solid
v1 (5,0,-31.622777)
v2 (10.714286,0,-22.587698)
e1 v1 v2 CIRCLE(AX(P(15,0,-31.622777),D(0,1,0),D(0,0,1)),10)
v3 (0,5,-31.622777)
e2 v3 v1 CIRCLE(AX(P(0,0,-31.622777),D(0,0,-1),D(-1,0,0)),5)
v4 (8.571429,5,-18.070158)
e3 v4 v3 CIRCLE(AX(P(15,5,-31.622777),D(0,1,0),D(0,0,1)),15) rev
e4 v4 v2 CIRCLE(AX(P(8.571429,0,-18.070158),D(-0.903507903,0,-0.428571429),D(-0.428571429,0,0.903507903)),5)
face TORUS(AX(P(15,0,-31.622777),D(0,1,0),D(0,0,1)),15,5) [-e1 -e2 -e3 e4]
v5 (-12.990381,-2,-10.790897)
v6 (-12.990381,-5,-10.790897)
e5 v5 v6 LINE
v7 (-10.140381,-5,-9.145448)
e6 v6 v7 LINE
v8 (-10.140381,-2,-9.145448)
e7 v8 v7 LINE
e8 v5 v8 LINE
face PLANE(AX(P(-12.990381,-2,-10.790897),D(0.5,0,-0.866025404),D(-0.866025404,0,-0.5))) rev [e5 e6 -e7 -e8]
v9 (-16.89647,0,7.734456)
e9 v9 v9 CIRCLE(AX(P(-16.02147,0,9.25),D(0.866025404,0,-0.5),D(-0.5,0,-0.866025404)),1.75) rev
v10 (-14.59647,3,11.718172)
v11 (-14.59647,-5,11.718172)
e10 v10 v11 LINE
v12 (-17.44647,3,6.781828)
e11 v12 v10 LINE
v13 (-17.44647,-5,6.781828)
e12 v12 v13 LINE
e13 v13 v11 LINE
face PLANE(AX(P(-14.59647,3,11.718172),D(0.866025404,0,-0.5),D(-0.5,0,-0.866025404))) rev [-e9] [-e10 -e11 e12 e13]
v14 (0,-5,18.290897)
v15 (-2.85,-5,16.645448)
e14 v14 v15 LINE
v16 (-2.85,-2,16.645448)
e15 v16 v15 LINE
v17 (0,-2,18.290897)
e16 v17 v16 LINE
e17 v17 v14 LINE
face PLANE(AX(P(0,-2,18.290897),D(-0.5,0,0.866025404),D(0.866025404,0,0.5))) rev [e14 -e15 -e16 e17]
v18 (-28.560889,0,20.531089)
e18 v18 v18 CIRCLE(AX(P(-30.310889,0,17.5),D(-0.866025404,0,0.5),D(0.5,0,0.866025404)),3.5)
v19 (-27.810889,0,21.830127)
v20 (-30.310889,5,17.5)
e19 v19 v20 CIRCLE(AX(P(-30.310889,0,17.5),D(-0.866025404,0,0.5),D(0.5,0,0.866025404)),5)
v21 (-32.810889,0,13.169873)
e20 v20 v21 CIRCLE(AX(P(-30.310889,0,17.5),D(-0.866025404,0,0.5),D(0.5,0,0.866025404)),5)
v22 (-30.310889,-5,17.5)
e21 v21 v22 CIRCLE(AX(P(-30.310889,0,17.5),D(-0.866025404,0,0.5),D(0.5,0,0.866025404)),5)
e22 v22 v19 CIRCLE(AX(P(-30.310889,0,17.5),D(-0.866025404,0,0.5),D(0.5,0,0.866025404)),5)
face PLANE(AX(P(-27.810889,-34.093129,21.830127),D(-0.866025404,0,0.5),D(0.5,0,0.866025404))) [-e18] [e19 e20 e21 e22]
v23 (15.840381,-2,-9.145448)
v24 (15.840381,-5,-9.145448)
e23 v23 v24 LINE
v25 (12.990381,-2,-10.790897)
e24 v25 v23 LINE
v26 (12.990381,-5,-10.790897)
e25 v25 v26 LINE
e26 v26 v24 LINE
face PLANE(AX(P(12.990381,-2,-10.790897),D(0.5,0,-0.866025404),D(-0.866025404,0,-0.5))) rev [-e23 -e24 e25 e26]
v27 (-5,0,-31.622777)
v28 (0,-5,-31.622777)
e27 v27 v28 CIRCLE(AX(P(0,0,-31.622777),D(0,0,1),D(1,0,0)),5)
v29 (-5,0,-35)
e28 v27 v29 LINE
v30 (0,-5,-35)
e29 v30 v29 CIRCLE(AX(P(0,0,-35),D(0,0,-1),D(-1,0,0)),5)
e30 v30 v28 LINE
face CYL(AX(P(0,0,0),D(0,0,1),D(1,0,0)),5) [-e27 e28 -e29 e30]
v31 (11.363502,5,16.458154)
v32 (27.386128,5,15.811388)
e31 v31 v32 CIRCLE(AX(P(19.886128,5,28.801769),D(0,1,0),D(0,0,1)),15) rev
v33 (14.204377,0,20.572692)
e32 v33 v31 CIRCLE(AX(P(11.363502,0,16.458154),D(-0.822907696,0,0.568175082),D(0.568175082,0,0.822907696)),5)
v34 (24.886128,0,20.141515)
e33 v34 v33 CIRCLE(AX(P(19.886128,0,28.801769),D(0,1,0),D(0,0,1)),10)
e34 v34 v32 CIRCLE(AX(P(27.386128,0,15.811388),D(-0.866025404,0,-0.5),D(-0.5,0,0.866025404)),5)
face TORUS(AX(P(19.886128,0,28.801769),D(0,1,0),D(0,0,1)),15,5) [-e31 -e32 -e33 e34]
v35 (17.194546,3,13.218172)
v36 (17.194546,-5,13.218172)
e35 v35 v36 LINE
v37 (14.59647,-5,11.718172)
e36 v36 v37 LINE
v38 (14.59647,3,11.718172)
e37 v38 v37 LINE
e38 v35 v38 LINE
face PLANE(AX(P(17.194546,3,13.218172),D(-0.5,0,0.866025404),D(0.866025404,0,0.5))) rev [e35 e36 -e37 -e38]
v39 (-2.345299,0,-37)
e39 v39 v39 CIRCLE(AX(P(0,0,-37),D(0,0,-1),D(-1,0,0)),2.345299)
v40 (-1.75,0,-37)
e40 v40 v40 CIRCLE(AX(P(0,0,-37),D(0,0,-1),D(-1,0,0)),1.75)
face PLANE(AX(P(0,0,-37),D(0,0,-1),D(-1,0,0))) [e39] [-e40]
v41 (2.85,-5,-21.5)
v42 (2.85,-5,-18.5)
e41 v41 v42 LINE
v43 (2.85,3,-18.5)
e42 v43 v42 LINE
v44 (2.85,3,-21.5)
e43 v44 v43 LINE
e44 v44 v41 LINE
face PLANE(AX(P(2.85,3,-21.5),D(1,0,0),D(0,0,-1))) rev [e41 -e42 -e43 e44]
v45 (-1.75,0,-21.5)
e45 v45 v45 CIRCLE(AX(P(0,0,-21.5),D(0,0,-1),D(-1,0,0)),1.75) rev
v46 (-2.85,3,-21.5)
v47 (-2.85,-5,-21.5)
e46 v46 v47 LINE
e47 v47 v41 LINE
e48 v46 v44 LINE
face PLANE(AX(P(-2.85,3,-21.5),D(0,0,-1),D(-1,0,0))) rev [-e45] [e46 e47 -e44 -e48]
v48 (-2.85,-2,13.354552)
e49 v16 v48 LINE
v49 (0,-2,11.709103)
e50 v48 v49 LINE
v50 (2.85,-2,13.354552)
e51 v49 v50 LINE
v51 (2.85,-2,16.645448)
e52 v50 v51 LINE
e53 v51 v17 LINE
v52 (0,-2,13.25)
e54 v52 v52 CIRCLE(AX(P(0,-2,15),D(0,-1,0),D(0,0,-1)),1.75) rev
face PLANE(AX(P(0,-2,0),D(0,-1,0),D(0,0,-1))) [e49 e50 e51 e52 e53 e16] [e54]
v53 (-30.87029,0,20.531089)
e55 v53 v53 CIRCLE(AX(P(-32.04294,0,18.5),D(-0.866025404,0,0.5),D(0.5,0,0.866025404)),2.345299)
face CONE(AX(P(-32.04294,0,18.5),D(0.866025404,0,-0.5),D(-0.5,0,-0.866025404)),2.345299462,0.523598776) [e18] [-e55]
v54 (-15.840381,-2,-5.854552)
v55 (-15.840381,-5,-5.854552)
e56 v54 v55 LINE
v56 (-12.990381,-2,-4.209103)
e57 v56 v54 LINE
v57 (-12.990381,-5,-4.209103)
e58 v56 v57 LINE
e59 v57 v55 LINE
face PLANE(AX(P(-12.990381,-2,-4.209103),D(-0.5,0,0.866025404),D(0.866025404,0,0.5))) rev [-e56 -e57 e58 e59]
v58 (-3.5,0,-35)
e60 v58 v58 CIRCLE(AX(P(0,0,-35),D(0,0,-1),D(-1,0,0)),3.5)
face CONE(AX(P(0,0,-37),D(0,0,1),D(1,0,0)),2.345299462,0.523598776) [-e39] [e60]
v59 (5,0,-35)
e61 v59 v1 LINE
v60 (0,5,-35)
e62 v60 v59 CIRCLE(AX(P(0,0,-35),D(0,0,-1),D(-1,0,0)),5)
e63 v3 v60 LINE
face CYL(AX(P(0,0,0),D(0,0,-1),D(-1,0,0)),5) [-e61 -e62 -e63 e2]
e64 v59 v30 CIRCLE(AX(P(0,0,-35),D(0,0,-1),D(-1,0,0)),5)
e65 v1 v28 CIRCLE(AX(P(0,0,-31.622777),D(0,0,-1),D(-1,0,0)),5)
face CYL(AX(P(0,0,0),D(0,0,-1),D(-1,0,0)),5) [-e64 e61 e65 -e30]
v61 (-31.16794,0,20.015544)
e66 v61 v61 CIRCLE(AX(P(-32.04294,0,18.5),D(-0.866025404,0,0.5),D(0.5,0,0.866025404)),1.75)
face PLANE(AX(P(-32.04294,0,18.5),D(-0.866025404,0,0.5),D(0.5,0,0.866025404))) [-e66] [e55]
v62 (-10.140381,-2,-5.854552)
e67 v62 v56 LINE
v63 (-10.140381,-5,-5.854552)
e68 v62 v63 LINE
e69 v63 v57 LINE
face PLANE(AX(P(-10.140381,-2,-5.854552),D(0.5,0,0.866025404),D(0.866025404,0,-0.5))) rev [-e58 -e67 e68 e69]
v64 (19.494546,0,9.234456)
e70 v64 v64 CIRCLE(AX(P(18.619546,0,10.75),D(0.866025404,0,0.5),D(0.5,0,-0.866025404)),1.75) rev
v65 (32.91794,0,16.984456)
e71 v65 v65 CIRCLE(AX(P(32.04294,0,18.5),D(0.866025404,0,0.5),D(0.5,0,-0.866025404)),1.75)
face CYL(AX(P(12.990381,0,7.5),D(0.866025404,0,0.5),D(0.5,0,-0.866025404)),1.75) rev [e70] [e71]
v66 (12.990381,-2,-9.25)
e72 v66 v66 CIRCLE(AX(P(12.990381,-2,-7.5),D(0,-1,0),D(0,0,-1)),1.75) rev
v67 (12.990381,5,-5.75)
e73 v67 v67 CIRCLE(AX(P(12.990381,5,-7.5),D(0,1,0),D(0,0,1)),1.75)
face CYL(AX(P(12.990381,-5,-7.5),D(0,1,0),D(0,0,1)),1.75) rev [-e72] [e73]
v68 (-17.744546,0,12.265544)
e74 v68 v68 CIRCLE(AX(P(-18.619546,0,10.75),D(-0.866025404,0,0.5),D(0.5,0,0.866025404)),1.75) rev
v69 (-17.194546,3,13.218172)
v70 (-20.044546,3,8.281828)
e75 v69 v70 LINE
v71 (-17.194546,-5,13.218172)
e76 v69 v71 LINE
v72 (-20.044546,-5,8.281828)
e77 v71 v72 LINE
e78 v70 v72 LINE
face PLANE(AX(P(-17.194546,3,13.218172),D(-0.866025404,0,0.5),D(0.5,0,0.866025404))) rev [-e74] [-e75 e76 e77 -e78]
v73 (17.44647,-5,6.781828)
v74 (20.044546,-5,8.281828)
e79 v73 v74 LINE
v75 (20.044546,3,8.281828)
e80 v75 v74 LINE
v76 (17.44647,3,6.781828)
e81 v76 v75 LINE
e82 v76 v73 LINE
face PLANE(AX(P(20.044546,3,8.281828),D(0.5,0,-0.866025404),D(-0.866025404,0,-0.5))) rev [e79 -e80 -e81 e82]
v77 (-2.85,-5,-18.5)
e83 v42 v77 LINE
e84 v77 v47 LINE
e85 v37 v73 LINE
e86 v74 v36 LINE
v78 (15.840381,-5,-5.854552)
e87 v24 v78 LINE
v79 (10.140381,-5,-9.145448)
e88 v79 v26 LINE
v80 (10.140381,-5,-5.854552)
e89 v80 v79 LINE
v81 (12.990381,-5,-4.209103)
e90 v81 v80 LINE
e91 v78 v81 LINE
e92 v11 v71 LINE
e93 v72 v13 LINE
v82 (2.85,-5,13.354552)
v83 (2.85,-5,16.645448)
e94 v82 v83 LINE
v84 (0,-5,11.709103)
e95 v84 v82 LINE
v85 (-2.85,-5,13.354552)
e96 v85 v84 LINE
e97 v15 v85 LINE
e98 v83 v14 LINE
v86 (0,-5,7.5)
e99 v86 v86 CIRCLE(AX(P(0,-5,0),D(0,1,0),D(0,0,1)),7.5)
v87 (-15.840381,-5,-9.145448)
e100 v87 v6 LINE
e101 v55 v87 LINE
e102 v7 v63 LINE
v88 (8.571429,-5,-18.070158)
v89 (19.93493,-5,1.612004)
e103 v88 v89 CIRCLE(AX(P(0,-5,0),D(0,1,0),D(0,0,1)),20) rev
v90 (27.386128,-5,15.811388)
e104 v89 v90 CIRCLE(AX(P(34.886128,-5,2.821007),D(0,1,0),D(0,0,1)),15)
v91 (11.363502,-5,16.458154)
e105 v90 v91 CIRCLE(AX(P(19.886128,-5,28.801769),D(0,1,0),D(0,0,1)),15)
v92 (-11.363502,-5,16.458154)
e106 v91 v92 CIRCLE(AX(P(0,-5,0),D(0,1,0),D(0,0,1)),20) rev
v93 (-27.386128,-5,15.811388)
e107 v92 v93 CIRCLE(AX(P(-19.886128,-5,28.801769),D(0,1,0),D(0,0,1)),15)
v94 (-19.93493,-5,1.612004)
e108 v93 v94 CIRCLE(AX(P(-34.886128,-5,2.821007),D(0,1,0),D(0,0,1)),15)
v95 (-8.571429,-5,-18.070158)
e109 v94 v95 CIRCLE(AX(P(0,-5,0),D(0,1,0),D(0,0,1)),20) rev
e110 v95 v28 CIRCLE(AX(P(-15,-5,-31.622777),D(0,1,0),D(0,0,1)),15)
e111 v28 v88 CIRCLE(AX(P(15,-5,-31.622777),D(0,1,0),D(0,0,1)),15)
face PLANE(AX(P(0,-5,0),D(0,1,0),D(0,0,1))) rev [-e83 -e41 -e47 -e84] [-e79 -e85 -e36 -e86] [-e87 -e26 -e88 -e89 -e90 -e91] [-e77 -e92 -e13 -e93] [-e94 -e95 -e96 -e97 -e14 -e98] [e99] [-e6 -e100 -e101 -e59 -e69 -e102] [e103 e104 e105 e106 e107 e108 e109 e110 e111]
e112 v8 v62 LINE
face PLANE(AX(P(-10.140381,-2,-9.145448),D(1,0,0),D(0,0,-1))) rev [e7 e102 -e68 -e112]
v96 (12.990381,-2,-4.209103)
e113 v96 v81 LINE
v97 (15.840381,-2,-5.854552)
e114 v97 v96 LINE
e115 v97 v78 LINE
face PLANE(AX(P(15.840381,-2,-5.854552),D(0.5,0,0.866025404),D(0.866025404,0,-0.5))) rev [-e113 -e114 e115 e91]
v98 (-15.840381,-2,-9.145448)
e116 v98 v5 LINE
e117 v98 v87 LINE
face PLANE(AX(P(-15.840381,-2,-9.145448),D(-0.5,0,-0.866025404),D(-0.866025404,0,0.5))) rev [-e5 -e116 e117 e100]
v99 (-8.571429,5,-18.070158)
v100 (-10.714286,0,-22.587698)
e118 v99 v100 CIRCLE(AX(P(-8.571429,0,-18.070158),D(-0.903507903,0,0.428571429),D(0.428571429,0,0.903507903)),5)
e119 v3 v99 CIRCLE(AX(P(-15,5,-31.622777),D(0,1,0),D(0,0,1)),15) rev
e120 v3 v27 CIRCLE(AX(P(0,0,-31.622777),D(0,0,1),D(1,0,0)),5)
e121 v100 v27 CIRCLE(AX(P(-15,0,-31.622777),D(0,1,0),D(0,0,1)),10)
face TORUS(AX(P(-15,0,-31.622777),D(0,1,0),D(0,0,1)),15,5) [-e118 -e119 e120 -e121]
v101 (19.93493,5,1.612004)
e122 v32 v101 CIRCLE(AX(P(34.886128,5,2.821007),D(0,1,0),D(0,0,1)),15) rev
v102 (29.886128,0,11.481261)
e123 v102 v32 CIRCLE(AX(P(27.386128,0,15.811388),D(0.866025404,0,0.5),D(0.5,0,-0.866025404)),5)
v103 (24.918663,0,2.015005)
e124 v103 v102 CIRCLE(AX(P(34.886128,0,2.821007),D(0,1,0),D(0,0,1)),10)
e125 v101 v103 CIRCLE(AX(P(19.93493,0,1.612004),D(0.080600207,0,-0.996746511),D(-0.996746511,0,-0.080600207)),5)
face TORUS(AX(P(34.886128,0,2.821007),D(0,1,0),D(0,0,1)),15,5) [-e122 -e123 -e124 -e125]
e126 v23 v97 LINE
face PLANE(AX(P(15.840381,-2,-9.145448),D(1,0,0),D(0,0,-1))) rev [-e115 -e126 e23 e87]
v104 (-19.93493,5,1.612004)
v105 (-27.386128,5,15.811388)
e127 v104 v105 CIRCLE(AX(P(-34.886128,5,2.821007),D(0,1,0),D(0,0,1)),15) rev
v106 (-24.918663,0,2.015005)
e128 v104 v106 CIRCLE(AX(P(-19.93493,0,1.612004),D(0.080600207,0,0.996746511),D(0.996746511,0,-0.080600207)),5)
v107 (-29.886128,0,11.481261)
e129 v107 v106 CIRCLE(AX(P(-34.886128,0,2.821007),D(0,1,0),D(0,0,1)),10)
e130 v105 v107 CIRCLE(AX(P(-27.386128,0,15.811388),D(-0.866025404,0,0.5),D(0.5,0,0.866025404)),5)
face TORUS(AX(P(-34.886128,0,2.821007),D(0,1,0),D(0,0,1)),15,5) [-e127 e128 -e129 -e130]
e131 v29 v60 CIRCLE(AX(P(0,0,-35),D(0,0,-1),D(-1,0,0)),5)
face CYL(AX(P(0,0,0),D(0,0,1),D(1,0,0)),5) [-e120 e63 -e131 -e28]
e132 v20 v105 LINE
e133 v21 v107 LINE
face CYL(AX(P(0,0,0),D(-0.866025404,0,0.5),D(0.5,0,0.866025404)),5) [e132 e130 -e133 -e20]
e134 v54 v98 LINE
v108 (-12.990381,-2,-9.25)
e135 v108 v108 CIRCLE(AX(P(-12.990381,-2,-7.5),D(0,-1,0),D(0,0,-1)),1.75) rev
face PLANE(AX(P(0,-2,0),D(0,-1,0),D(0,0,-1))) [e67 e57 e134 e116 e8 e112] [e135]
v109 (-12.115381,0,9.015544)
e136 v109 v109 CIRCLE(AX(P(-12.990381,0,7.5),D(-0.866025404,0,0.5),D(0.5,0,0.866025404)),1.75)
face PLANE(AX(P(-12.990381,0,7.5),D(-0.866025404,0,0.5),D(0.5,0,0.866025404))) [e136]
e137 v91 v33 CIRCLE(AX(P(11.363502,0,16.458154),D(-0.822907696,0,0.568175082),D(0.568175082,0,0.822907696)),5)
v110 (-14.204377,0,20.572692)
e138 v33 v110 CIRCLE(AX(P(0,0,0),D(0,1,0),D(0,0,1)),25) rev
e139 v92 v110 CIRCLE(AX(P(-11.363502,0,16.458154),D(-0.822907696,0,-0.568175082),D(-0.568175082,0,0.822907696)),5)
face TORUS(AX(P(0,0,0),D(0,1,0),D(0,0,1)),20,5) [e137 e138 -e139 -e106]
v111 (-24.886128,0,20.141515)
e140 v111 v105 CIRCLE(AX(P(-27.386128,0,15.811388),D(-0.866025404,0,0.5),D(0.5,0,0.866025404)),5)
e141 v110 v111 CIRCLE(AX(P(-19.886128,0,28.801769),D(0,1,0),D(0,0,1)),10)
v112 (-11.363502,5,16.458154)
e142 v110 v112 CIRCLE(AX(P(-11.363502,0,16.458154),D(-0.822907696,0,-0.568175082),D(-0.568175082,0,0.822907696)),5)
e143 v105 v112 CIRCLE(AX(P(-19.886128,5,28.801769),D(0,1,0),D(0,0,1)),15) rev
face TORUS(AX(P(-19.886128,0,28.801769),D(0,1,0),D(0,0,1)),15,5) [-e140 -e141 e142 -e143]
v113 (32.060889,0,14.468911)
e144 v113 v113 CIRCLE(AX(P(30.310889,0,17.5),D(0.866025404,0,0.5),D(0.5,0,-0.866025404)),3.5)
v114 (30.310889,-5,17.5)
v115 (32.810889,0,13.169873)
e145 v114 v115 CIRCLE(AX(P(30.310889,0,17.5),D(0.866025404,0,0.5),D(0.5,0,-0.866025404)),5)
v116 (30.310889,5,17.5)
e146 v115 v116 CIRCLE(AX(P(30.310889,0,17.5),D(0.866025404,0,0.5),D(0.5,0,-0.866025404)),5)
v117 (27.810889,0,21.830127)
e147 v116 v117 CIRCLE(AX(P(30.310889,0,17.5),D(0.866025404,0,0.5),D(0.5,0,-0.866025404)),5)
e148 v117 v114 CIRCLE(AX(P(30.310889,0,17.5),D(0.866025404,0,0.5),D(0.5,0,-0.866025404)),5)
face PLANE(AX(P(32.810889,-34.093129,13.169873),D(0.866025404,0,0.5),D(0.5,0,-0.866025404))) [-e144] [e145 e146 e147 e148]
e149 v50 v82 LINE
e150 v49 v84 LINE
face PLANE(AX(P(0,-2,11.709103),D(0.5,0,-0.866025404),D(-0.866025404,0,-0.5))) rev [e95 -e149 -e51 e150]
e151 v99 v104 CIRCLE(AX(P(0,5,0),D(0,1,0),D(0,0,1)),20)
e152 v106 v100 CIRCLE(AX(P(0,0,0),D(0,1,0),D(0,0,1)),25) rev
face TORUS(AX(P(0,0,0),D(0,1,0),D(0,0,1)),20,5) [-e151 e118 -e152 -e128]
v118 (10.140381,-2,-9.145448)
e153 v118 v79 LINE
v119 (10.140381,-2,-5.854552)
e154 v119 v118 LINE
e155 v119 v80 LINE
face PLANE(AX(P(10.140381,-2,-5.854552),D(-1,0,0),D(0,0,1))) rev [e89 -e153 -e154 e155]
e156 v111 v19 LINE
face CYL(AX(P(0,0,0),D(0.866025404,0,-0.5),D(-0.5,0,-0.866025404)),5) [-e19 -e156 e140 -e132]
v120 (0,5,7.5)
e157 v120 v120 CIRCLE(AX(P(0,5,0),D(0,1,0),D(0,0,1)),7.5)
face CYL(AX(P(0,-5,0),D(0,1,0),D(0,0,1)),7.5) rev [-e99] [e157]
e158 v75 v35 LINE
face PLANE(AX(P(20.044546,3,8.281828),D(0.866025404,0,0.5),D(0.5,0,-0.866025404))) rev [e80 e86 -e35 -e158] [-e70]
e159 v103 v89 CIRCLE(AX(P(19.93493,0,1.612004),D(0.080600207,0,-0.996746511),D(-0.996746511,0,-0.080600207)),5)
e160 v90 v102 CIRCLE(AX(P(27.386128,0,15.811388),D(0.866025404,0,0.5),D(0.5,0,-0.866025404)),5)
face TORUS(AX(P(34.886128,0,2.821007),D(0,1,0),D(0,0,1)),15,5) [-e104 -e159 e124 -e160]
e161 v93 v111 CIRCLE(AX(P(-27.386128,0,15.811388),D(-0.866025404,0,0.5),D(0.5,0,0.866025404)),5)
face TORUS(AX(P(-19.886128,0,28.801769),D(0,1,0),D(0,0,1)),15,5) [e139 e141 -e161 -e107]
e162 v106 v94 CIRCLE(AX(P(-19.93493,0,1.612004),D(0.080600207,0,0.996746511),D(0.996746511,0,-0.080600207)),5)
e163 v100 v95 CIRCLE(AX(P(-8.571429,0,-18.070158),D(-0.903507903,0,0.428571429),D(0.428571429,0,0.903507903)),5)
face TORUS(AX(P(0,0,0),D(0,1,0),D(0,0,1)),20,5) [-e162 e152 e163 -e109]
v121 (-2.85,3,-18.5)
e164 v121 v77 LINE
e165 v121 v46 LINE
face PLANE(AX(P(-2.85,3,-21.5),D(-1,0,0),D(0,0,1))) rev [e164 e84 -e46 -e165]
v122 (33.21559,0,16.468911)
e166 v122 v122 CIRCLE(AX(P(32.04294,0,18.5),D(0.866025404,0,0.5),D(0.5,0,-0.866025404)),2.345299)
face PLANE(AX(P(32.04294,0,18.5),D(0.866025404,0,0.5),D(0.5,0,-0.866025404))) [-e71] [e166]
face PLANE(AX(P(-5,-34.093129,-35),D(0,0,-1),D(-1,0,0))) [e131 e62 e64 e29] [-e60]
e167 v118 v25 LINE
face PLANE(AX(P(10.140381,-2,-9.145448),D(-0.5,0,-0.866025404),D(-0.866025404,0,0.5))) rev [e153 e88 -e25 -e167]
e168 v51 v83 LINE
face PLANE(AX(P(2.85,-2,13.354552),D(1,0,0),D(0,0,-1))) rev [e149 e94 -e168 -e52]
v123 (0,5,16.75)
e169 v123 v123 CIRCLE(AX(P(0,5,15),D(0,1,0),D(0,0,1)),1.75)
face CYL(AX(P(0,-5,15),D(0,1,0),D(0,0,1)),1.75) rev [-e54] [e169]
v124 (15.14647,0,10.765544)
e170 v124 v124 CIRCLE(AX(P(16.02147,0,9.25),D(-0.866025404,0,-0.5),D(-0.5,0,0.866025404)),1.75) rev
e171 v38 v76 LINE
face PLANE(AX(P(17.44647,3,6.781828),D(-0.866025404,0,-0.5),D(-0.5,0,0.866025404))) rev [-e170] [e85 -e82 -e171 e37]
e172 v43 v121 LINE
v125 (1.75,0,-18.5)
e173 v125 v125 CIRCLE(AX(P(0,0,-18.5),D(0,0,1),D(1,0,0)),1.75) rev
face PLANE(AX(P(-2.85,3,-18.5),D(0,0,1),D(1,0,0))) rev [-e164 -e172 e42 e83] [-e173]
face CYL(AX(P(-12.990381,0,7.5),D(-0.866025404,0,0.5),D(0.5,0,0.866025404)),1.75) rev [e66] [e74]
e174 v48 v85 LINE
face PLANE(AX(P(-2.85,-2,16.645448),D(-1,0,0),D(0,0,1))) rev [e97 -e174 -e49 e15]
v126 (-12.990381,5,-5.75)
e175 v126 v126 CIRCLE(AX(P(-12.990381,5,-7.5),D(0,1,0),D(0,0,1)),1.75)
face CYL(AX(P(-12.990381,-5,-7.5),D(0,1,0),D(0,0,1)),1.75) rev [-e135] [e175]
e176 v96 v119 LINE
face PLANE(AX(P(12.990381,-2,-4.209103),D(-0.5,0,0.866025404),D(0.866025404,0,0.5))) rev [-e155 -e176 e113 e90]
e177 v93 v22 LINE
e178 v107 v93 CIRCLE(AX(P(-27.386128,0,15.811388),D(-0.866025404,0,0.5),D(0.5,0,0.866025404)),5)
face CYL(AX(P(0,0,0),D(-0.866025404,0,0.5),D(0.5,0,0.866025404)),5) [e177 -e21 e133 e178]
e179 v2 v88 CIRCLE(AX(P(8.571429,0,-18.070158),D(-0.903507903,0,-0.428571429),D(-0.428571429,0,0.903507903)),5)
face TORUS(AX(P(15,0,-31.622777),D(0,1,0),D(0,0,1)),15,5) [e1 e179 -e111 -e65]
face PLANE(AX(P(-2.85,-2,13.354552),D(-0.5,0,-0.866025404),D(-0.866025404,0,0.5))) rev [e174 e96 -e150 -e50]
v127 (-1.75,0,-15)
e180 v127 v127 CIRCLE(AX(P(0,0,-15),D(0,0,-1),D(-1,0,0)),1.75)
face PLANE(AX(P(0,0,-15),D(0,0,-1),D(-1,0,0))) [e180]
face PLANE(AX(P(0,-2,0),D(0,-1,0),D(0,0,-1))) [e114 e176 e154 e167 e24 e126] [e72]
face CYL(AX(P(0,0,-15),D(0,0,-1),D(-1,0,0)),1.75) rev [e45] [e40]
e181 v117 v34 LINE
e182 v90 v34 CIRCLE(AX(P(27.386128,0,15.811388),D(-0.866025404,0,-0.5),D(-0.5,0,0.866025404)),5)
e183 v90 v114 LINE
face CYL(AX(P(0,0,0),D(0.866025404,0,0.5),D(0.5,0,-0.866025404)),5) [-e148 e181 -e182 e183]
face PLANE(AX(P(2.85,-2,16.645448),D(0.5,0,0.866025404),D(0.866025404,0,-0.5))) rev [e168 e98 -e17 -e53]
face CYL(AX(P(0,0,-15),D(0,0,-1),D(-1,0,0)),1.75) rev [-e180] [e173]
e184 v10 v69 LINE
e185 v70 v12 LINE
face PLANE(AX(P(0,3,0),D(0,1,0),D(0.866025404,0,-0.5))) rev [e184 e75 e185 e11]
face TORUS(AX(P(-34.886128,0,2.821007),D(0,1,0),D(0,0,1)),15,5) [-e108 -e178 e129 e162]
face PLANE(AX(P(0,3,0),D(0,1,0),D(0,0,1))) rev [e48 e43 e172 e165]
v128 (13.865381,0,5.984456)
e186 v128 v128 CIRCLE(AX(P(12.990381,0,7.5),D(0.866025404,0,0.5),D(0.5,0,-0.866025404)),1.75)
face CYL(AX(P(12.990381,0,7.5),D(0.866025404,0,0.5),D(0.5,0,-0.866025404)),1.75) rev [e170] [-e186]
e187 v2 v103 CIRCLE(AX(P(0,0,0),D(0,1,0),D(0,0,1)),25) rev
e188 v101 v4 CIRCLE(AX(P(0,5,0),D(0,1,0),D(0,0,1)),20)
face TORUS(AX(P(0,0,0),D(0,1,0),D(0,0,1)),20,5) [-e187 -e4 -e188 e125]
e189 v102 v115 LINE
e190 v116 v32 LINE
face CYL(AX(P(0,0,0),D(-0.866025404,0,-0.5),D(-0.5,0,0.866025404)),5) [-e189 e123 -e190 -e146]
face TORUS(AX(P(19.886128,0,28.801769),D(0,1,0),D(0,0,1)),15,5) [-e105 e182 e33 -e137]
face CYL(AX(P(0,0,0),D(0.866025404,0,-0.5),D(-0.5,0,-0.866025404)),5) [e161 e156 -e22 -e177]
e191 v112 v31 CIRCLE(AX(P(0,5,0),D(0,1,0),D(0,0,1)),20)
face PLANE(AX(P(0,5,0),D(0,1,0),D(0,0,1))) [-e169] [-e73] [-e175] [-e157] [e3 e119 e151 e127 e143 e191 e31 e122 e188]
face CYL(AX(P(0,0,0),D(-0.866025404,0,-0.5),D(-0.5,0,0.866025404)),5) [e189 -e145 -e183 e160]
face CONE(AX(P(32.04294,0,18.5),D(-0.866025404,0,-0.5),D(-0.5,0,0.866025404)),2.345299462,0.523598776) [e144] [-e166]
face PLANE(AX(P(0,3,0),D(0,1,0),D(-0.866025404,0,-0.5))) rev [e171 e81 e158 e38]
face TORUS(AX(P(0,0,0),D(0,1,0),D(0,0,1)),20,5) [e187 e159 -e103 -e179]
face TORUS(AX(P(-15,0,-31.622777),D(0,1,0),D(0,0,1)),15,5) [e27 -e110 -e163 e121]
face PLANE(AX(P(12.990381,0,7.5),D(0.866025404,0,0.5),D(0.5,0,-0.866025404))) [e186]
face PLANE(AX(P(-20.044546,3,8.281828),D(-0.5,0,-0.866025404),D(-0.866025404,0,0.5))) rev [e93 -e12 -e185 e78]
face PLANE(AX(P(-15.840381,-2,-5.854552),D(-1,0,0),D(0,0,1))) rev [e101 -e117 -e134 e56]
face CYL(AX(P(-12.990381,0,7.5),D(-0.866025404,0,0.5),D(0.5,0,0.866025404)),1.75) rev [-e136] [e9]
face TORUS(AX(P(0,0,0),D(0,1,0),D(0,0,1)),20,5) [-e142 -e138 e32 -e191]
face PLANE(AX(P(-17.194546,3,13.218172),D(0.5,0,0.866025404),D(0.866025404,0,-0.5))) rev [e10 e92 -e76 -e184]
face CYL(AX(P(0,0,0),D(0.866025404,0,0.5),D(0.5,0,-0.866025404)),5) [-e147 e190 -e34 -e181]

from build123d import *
from OCP.BRepFilletAPI import BRepFilletAPI_MakeChamfer

# Parameters (mm, degrees)
SKETCH1_R                      = 25
BOSS_EXTRUDE1_DEPTH            = 5
SKETCH2_W                      = 10
SKETCH2_H                      = 20
BOSS_EXTRUDE2_DEPTH            = 10
FILLET1_R                      = 10
FILLET2_R                      = 5
SKETCH3_R                      = 1.75
CUT_EXTRUDE1_DEPTH             = 20
SKETCH4_W                      = 5.7
SKETCH4_H                      = 3
CUT_EXTRUDE2_DEPTH             = 8
CIRPATTERN1_COUNT              = 3
SKETCH5_R                      = 1.75
CUT_EXTRUDE3_DEPTH             = 50.005657282
SKETCH7_R                      = 7.5
CUT_EXTRUDE5_DEPTH             = 50.005657282
SKETCH8_R                      = 3.5
BOSS_EXTRUDE3_DEPTH            = 2
CHAMFER1_SIZE2                 = 1.154700538
CHAMFER1_SIZE                  = 2
SKETCH9_R                      = 1.75
CUT_EXTRUDE6_DEPTH             = 2
CIRPATTERN2_COUNT              = 3
CHAMFER1_OF_CIRPATTERN2_SIZE   = 2
CHAMFER1_OF_CIRPATTERN2_SIZE_2 = 1.154700538
SKETCH10_R                     = 1.75
CUT_EXTRUDE7_DEPTH             = 2
SKETCH11_R                     = 1.75
CUT_EXTRUDE8_DEPTH             = 2
CUT_EXTRUDE9_DEPTH             = 3


with BuildPart() as part:
    # Sketch1 → Boss-Extrude1 (new, symmetric)
    with BuildSketch(Plane(origin=(0, 0, 0), x_dir=(1, 0, 0), z_dir=(0, 1, 0))):
        with Locations(Location((0, 0, 0), (0, 0, 270))):
            Circle(SKETCH1_R)
    extrude(amount=BOSS_EXTRUDE1_DEPTH, both=True)

    # Sketch2 → Boss-Extrude2 (add)
    with BuildSketch(Plane(origin=(0, 5, 0), x_dir=(1, 0, 0), z_dir=(0, 1, 0))):
        Polygon((15.490381057, -3.169872981), (10.490381057, -11.830127019), (27.810889132, -21.830127019), (32.810889132, -13.169872981), align=None)
        with Locations((0, 25)):
            Rectangle(SKETCH2_W, SKETCH2_H)
        Polygon((-10.490381057, -11.830127019), (-15.490381057, -3.169872981), (-32.810889132, -13.169872981), (-27.810889132, -21.830127019), align=None)
    extrude(amount=-BOSS_EXTRUDE2_DEPTH)

    # Fillet1
    fillet1_edges = [part.edges().sort_by_distance(p)[0] for p in [
        (5, 0, -24.494897428),
        (-5, 0, -24.494897428),
        (18.713203436, 0, 16.577575733),
        (23.713203436, 0, 7.917321695),
        (-23.713203436, 0, 7.917321695),
        (-18.713203436, 0, 16.577575733),
    ]]
    fillet(fillet1_edges, radius=FILLET1_R)

    # Fillet2
    fillet2_edges = [part.edges().sort_by_distance(p)[0] for p in [
        (-5, 5, -33.311388301),
        (-6.548457453, 5, -26.277551763),
        (-6.548457453, -5, -26.277551763),
        (-31.348508504, 5, 12.325567131),
        (-26.031256103, -5, 7.467645372),
        (-26.031256103, 5, 7.467645372),
        (31.348508504, 5, 12.325567131),
        (26.031256103, 5, 7.467645372),
        (26.031256103, -5, 7.467645372),
        (5, 5, -33.311388301),
        (6.548457453, -5, -26.277551763),
        (6.548457453, 5, -26.277551763),
        (-26.348508504, 5, 20.985821169),
        (-19.48279865, 5, 18.809906391),
        (-19.48279865, -5, 18.809906391),
        (26.348508504, 5, 20.985821169),
        (19.48279865, -5, 18.809906391),
        (19.48279865, 5, 18.809906391),
        (-21.650635095, 5, -12.5),
        (-21.650635095, -5, -12.5),
        (21.650635095, 5, -12.5),
        (21.650635095, -5, -12.5),
        (0, 5, 25),
        (0, -5, 25),
        (31.348508504, -5, 12.325567131),
        (5, -5, -33.311388301),
        (-26.348508504, -5, 20.985821169),
        (26.348508504, -5, 20.985821169),
        (-31.348508504, -5, 12.325567131),
        (-5, -5, -33.311388301),
    ]]
    fillet(fillet2_edges, radius=FILLET2_R - 0.0001)  # a hair under: the kernel refuses the full size

    # Sketch3 → Cut-Extrude1 (cut)
    with BuildSketch(Plane(origin=(0, 0, -35), x_dir=(-1, 0, 0), z_dir=(0, 0, -1))):
        Circle(SKETCH3_R)
    cut_extrude1 = extrude(amount=-CUT_EXTRUDE1_DEPTH, mode=Mode.SUBTRACT)

    # Sketch4 → Cut-Extrude2 (cut)
    with BuildSketch(Plane.XZ.offset(5)):
        with Locations((0, -20)):
            Rectangle(SKETCH4_W, SKETCH4_H)
    cut_extrude2 = extrude(amount=-CUT_EXTRUDE2_DEPTH, mode=Mode.SUBTRACT)

    # CirPattern1: Cut-Extrude1, Cut-Extrude2 ×3 about axis
    cirpattern1_axis = Axis((0, 0, 0), (0, 1, 0))
    add([cut_extrude1.rotate(cirpattern1_axis, i * 360 / CIRPATTERN1_COUNT) for i in range(1, CIRPATTERN1_COUNT)], mode=Mode.SUBTRACT)
    add([cut_extrude2.rotate(cirpattern1_axis, i * 360 / CIRPATTERN1_COUNT) for i in range(1, CIRPATTERN1_COUNT)], mode=Mode.SUBTRACT)

    # Sketch5 → Cut-Extrude3 (cut, through all)
    with BuildSketch(Plane(origin=(0, 5, 0), x_dir=(1, 0, 0), z_dir=(0, 1, 0))):
        with Locations(Location((-12.990381057, 7.5, 0), (0, 0, 270))):
            Circle(SKETCH5_R)
        with Locations(Location((12.990381057, 7.5, 0), (0, 0, 270))):
            Circle(SKETCH5_R)
        with Locations(Location((0, -15, 0), (0, 0, 270))):
            Circle(SKETCH5_R)
    extrude(amount=-CUT_EXTRUDE3_DEPTH, mode=Mode.SUBTRACT)

    # Sketch7 → Cut-Extrude5 (cut, through all)
    with BuildSketch(Plane(origin=(0, 5, 0), x_dir=(1, 0, 0), z_dir=(0, 1, 0))):
        with Locations(Location((0, 0, 0), (0, 0, 270))):
            Circle(SKETCH7_R)
    extrude(amount=-CUT_EXTRUDE5_DEPTH, mode=Mode.SUBTRACT)

    # Sketch8 → Boss-Extrude3 (add)
    with BuildSketch(Plane(origin=(30.310889132, 0, 17.5), x_dir=(0.4999999999999999, 0, -0.8660254037844386), z_dir=(0.8660254037844387, 0, 0.49999999999999994))):
        Circle(SKETCH8_R)
    boss_extrude3 = extrude(amount=BOSS_EXTRUDE3_DEPTH)

    # Chamfer1
    chamfer1_edges = [part.edges().sort_by_distance(p)[0] for p in [
        (30.29293994, 0, 21.531088913),
    ]]
    chamfer1_side = [part.faces().sort_by_distance(p)[0] for p in [
        (30.27293994, 0, 21.519541908),
    ]]
    chamfer(chamfer1_edges, length=CHAMFER1_SIZE - 0.0001, length2=CHAMFER1_SIZE2 - 0.0001, reference=chamfer1_side[0])  # a hair under: the kernel refuses the full size

    # Sketch9 → Cut-Extrude6 (cut)
    with BuildSketch(Plane(origin=(32.04293994, 0, 18.5), x_dir=(0.49999999999999983, 0, -0.8660254037844387), z_dir=(0.8660254037844387, 0, 0.49999999999999983))):
        Circle(SKETCH9_R)
    extrude(amount=-CUT_EXTRUDE6_DEPTH, mode=Mode.SUBTRACT)

    # CirPattern2: Boss-Extrude3 ×3 about axis
    cirpattern2_axis = Axis((0, 0, 0), (0, 1, 0))
    for i in range(1, CIRPATTERN2_COUNT):
        add(boss_extrude3.rotate(cirpattern2_axis, i * 360 / CIRPATTERN2_COUNT))

    # Chamfer1 of CirPattern2
    chamfer1_of_cirpattern2_edges_1 = [part.edges().sort_by_distance(p)[0] for p in [
        (3.5, 0, -37),
    ]]
    chamfer1_of_cirpattern2_side_1 = [part.faces().sort_by_distance(p)[0] for p in [
        (3.5, 0, -36.976905989),
    ]]
    chamfer1_of_cirpattern2_edges_2 = [part.edges().sort_by_distance(p)[0] for p in [
        (-33.79293994, 0, 15.468911087),
    ]]
    chamfer1_of_cirpattern2_side_2 = [part.faces().sort_by_distance(p)[0] for p in [
        (-33.77293994, 0, 15.457364081),
    ]]
    chamfer1_of_cirpattern2 = BRepFilletAPI_MakeChamfer(part.part.solid().wrapped)
    for e in chamfer1_of_cirpattern2_edges_1:
        chamfer1_of_cirpattern2.Add(CHAMFER1_OF_CIRPATTERN2_SIZE - 0.0001, CHAMFER1_OF_CIRPATTERN2_SIZE_2 - 0.0001, e.wrapped, chamfer1_of_cirpattern2_side_1[0].wrapped)
    for e in chamfer1_of_cirpattern2_edges_2:
        chamfer1_of_cirpattern2.Add(CHAMFER1_OF_CIRPATTERN2_SIZE - 0.0001, CHAMFER1_OF_CIRPATTERN2_SIZE_2 - 0.0001, e.wrapped, chamfer1_of_cirpattern2_side_2[0].wrapped)
    add(Compound.cast(chamfer1_of_cirpattern2.Shape()), mode=Mode.REPLACE)  # a hair under: the kernel refuses the full size

    # Sketch10 → Cut-Extrude7 (cut)
    with BuildSketch(Plane(origin=(-32.04293994, 0, 18.5), x_dir=(0.4999999999999961, 0, 0.8660254037844409), z_dir=(-0.8660254037844409, 0, 0.4999999999999961))):
        Circle(SKETCH10_R)
    extrude(amount=-CUT_EXTRUDE7_DEPTH, mode=Mode.SUBTRACT)

    # Sketch11 → Cut-Extrude8 (cut)
    with BuildSketch(Plane(origin=(0, 0, -37), x_dir=(-1, 0, 0), z_dir=(0, 0, -1))):
        Circle(SKETCH11_R)
    extrude(amount=-CUT_EXTRUDE8_DEPTH, mode=Mode.SUBTRACT)

    # Sketch12 → Cut-Extrude9 (cut)
    with BuildSketch(Plane.XZ.offset(5)):
        Polygon((12.990381057, -10.790896534), (15.840381057, -9.145448267), (15.840381057, -5.854551733), (12.990381057, -4.209103466), (10.140381057, -5.854551733), (10.140381057, -9.145448267), align=None)
        Polygon((-15.840381057, -5.854551733), (-15.840381057, -9.145448267), (-12.990381057, -10.790896534), (-10.140381057, -9.145448267), (-10.140381057, -5.854551733), (-12.990381057, -4.209103466), align=None)
        Polygon((2.85, 16.645448267), (0, 18.290896534), (-2.85, 16.645448267), (-2.85, 13.354551733), (0, 11.709103466), (2.85, 13.354551733), align=None)
    extrude(amount=-CUT_EXTRUDE9_DEPTH, mode=Mode.SUBTRACT)


solid = part.part
